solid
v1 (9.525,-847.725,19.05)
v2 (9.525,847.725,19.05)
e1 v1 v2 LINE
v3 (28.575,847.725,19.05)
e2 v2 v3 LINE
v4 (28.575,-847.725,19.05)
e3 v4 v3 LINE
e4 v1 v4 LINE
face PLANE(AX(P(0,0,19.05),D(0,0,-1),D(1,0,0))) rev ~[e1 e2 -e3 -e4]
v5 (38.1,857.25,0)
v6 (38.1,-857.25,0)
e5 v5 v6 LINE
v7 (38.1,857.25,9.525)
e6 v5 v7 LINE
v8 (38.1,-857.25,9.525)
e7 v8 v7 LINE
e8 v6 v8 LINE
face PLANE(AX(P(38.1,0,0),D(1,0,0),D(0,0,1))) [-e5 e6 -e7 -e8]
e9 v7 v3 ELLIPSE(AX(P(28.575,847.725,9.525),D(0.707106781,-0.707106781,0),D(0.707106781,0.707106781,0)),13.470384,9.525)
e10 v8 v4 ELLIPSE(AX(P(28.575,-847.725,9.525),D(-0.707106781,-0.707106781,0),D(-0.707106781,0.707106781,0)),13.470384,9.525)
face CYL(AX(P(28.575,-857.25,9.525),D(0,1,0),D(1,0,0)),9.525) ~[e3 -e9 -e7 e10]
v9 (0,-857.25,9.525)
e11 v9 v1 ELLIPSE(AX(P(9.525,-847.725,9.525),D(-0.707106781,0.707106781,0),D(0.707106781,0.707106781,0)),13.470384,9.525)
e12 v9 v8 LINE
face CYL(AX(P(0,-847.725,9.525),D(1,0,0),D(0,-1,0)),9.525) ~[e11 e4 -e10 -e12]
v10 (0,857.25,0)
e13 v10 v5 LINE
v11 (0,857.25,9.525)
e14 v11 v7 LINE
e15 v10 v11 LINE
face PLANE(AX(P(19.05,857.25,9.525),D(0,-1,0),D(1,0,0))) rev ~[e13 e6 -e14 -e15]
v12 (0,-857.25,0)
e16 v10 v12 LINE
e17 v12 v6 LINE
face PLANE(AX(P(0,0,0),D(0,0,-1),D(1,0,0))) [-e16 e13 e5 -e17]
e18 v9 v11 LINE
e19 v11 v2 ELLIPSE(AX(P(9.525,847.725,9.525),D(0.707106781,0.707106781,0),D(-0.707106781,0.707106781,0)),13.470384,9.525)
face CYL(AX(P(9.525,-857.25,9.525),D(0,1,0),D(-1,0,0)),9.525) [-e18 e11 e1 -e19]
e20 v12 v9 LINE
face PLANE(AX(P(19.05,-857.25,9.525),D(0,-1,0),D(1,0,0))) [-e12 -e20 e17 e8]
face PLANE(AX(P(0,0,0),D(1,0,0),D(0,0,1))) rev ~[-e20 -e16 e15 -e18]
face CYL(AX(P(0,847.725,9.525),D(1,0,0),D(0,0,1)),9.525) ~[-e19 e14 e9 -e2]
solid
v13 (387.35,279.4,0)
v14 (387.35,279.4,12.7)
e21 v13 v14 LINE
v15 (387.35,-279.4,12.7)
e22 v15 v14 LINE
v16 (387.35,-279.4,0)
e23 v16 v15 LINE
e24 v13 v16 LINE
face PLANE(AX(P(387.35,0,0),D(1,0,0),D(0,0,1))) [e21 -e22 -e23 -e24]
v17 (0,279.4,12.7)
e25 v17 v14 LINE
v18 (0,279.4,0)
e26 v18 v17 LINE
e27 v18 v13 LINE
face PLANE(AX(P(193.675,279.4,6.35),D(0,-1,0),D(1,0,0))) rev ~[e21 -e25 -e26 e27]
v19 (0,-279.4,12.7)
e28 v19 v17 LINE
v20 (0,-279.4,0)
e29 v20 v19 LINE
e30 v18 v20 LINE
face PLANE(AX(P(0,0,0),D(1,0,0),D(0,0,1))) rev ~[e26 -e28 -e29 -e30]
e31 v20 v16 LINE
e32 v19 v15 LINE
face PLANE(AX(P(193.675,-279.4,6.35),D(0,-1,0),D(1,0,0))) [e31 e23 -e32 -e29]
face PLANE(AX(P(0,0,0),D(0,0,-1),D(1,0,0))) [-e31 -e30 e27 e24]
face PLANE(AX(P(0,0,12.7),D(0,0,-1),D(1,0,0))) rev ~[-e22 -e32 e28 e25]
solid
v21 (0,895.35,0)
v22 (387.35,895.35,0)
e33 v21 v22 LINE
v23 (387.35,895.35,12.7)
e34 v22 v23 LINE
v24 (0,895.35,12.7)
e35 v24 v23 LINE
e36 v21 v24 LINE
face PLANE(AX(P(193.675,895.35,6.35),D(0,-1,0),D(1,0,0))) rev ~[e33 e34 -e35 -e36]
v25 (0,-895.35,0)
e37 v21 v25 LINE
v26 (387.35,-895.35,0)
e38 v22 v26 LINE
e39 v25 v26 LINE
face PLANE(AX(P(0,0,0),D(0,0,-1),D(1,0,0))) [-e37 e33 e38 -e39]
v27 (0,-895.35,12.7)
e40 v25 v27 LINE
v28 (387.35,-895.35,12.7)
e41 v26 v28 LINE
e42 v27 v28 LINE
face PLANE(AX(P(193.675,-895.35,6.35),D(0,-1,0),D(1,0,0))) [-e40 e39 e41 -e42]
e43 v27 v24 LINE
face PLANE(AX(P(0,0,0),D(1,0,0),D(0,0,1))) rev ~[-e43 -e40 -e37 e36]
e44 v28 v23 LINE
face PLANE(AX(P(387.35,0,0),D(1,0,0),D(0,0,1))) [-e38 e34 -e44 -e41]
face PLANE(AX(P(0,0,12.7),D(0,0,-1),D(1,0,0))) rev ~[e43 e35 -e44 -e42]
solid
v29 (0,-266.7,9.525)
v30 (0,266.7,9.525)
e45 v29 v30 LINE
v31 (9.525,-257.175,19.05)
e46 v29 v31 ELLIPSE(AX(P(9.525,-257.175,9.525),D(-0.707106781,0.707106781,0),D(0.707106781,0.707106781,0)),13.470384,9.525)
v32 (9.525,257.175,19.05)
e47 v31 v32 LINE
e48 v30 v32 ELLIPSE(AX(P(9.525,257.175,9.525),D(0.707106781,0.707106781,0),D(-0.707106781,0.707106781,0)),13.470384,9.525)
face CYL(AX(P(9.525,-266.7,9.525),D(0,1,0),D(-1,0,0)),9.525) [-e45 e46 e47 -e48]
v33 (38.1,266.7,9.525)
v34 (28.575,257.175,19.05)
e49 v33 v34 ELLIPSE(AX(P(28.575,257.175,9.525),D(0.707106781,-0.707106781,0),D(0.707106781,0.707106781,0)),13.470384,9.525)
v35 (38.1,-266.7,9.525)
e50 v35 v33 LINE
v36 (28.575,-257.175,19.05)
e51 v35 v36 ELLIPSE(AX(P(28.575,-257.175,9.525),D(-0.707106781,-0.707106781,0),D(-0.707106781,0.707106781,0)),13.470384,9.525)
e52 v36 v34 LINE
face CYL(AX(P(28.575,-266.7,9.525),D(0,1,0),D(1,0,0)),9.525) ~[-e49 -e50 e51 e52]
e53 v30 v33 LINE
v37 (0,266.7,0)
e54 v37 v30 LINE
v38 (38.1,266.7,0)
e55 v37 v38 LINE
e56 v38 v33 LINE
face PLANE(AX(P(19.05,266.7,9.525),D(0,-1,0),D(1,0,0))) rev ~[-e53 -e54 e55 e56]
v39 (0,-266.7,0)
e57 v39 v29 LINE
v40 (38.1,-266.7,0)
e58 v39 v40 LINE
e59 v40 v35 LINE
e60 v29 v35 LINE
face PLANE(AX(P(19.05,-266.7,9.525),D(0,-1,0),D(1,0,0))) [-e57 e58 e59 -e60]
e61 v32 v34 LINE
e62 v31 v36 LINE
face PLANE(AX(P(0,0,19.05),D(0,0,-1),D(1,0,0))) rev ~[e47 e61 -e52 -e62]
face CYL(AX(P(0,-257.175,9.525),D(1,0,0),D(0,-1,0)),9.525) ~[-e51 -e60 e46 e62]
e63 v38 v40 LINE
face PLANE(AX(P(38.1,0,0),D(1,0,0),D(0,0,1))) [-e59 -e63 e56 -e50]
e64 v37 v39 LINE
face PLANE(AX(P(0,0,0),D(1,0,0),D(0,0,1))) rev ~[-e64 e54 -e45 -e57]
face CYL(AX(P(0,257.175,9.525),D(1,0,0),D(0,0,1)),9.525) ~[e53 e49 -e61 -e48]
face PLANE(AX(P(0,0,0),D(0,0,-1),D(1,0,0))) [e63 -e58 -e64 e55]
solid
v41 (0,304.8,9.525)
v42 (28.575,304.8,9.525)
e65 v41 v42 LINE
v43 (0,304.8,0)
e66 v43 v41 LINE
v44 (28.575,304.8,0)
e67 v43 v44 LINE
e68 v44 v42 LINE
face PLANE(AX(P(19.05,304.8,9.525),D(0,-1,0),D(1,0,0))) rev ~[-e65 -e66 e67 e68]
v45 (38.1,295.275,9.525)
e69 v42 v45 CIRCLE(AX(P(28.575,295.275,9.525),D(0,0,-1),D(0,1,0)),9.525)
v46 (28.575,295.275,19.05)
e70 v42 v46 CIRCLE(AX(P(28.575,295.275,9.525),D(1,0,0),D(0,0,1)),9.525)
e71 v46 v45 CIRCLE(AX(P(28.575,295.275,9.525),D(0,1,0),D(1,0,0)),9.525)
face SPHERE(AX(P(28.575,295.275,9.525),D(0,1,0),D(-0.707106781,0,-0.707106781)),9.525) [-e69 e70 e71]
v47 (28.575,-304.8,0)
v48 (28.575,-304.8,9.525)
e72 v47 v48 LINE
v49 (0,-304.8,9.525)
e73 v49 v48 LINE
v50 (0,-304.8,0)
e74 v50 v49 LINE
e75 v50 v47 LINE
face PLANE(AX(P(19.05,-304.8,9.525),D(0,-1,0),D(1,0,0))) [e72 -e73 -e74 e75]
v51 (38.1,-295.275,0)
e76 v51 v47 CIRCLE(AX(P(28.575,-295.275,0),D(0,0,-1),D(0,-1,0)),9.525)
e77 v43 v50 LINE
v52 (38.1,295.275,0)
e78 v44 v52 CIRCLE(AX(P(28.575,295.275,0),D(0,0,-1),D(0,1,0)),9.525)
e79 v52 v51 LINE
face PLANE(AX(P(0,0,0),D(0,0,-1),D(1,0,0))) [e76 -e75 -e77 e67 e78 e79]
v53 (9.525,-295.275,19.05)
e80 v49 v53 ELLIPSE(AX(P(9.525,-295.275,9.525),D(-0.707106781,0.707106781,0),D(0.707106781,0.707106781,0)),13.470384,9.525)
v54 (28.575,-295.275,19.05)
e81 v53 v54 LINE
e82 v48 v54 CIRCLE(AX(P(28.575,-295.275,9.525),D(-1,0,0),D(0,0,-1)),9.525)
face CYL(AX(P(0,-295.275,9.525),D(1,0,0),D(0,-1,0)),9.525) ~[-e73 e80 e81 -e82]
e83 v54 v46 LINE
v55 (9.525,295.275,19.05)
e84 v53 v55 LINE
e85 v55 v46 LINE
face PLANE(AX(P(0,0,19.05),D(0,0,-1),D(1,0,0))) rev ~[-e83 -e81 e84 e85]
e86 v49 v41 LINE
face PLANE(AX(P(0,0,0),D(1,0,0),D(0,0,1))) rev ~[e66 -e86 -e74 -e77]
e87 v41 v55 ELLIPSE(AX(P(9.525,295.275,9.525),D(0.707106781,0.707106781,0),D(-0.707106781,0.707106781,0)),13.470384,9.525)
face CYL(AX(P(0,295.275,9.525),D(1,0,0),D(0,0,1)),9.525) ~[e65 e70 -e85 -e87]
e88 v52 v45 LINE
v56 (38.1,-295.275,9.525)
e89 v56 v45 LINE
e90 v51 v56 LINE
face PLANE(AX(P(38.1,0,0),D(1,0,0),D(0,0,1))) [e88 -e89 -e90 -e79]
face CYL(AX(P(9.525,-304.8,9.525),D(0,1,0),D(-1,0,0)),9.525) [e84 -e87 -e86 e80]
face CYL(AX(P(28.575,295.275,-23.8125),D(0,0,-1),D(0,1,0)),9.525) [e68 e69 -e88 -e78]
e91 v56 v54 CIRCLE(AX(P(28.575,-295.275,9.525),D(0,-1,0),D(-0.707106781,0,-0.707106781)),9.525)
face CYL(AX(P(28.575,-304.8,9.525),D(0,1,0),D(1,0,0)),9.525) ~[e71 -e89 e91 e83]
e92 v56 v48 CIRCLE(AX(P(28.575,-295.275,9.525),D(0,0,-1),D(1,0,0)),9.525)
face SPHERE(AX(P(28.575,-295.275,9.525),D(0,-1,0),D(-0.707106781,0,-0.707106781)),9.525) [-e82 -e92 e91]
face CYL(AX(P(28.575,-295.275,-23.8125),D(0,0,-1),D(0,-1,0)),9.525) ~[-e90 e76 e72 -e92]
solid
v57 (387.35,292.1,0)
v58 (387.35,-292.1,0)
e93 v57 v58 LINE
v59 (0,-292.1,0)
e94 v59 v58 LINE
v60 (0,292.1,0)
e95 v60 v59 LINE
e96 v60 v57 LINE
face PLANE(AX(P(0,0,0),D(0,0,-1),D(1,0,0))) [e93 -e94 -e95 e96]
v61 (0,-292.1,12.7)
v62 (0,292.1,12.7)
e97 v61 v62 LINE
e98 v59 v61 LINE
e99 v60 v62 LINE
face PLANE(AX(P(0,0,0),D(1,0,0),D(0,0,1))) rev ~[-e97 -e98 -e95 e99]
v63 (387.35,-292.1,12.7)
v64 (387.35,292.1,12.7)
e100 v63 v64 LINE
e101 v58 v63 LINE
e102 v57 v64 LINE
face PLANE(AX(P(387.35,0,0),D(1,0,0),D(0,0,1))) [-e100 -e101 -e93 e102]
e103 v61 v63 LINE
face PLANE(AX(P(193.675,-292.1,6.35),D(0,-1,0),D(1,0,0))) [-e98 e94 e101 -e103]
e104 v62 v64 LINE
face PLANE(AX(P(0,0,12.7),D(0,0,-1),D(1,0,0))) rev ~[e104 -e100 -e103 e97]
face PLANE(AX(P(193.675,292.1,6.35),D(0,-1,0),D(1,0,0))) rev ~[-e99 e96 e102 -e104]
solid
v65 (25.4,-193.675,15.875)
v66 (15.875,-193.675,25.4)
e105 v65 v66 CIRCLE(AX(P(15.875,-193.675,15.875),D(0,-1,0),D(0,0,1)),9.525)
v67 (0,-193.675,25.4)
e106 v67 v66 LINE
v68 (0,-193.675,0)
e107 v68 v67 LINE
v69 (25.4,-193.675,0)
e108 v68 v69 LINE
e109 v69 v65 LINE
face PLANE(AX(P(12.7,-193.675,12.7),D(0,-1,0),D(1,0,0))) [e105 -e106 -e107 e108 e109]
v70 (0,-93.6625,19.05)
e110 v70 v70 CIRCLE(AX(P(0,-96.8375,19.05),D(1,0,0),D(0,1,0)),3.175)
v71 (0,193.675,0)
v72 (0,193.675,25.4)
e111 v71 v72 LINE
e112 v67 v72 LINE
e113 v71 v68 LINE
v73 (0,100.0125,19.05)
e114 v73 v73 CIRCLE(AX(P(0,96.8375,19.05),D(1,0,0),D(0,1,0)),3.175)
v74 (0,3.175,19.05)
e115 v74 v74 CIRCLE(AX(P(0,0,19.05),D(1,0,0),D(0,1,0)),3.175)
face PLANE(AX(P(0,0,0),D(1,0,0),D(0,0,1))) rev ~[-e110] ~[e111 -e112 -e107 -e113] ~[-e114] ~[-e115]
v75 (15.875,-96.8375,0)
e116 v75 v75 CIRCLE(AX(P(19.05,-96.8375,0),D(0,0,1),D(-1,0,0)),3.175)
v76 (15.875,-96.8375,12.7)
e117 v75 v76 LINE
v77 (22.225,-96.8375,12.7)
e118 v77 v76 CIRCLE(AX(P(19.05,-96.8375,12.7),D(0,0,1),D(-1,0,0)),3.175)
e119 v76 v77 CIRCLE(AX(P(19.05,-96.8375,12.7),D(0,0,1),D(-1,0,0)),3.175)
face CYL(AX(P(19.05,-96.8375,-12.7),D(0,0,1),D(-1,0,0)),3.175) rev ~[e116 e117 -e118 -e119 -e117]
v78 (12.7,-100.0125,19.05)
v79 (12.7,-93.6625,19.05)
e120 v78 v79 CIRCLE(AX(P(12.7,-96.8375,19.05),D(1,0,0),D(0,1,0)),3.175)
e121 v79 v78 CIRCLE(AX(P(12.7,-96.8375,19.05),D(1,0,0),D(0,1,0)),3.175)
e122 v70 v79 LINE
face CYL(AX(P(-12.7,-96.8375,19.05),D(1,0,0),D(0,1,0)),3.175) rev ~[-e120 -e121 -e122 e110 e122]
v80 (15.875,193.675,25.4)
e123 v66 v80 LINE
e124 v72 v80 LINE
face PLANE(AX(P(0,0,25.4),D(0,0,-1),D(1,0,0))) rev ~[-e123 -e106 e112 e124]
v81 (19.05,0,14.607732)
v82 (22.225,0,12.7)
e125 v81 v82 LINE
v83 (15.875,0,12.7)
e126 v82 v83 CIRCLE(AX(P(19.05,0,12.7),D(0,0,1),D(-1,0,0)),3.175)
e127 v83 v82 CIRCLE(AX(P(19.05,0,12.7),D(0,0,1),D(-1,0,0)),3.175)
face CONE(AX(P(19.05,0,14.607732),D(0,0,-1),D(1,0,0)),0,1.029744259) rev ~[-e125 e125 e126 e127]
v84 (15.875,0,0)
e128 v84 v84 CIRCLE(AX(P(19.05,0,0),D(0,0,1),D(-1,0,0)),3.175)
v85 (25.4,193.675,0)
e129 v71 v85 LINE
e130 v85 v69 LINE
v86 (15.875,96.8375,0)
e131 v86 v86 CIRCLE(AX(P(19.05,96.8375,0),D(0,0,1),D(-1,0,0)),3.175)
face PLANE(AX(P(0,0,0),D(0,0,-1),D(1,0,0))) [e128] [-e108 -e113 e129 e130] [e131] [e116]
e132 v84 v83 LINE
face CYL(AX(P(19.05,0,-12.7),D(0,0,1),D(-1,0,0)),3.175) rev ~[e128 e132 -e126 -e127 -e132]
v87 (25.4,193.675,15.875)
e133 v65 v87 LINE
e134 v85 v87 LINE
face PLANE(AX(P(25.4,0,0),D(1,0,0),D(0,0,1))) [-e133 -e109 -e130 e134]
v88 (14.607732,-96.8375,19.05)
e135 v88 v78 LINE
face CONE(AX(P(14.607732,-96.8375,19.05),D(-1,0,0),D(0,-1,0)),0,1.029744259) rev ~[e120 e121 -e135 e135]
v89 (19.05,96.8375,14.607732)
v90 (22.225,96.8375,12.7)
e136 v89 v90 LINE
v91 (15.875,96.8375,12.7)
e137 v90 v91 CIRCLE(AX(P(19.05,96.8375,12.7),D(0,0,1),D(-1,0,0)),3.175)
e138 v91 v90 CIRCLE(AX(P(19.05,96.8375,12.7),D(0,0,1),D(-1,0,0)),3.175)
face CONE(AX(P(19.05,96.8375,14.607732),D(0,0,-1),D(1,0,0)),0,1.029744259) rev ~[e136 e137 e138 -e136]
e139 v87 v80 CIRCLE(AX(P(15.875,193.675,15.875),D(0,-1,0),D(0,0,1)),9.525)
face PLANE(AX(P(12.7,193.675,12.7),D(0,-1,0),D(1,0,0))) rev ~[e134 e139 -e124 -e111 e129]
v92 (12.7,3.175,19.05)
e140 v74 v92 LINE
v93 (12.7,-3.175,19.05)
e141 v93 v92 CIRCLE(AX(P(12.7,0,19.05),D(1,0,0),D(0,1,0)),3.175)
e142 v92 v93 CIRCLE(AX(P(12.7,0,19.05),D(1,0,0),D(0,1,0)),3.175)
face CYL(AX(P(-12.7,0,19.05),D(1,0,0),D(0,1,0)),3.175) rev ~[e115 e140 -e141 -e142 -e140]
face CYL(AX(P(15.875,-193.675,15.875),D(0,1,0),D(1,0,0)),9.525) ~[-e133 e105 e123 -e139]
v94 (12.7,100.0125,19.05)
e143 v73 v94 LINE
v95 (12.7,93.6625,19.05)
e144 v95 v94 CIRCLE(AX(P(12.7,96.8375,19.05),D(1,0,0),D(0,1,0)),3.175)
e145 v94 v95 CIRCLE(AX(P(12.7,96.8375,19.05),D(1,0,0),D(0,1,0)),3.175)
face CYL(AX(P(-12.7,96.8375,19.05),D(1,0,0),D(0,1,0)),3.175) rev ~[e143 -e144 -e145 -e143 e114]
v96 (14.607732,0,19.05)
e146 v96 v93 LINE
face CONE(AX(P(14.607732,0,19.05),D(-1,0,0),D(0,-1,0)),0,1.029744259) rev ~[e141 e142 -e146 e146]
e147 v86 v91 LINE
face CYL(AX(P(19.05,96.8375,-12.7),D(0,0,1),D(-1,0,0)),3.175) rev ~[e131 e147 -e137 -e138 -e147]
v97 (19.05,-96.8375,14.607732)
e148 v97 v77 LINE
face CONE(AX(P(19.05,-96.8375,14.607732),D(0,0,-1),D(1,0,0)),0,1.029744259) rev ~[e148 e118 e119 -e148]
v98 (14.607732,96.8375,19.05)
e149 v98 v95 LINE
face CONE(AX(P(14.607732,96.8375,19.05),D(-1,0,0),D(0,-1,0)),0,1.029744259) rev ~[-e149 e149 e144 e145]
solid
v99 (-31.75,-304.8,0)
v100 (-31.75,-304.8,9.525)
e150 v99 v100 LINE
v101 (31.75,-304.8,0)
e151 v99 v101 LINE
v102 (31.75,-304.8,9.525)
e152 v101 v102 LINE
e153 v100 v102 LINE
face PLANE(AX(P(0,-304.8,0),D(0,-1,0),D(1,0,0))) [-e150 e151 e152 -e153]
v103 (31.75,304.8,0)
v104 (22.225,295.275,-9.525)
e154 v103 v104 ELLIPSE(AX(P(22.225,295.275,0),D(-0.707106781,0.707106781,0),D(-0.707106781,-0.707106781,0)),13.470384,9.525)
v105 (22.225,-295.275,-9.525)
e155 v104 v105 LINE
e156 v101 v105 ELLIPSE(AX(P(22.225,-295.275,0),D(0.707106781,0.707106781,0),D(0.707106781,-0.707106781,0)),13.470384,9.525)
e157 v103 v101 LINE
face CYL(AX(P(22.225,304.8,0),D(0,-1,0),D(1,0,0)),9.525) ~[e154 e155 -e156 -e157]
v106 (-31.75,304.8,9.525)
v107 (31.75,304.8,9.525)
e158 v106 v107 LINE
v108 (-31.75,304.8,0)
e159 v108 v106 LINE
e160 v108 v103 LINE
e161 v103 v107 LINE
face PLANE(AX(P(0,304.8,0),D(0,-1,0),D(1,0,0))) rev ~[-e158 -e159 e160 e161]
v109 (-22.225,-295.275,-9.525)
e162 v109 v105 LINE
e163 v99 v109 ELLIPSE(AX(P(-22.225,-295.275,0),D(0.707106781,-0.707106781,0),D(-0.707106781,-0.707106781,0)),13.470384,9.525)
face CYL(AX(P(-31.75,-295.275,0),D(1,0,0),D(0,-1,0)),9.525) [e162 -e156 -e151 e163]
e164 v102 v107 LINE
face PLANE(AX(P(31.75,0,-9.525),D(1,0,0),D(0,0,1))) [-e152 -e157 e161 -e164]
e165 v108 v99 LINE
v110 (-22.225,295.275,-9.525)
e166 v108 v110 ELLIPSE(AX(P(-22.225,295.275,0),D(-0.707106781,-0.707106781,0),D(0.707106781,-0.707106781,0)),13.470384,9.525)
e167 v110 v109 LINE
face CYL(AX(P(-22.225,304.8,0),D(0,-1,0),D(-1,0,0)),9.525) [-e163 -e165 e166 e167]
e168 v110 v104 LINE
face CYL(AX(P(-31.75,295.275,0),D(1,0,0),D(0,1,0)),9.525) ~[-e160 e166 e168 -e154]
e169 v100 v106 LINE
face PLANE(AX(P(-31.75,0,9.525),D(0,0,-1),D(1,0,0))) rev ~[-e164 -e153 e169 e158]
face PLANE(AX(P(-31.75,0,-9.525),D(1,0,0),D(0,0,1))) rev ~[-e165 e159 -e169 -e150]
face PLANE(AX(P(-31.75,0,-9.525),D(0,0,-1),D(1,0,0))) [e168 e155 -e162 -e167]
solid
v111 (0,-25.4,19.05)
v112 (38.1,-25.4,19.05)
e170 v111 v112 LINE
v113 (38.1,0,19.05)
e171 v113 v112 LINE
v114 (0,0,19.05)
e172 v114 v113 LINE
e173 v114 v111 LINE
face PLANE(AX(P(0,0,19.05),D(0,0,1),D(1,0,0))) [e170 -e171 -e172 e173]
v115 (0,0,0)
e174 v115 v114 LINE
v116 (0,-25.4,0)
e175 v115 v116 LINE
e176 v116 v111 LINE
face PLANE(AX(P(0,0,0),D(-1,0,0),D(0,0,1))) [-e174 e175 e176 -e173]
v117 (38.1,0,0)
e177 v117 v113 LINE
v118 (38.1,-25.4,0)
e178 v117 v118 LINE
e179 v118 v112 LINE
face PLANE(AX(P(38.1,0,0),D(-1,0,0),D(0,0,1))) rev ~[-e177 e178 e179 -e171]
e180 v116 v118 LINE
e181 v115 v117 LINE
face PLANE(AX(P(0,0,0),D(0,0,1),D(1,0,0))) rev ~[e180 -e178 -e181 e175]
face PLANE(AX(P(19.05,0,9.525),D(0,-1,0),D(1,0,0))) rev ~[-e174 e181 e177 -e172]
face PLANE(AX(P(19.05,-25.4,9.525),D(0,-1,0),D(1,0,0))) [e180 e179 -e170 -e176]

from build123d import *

# Parameters (mm, degrees)
F0_W          = 63.5
F0_H          = 19.05
F1_DEPTH      = 304.8
F2_R          = 9.525
F3_W          = 38.1
F3_H          = 19.05
F4_DEPTH      = 304.8
F5_R          = 9.525
F6_W          = 38.1
F6_H          = 19.05
F7_DEPTH      = 857.25
F8_R          = 9.525
F9_W          = 38.1
F9_H          = 19.05
F10_DEPTH     = 266.7
F11_R         = 9.525
F12_DEPTH     = 25.4
F13_W         = 25.4
F13_H         = 25.4
F14_DEPTH     = 193.675
F15_R         = 9.525
F17_D         = 6.35
F17_DEPTH     = 12.7
F17_TIP       = 1.9077324654
F19_D         = 6.35
F19_DEPTH     = 12.7
F19_TIP       = 1.9077324654
F20_T1_DEPTH  = 33.3375
F20_S5_W      = 9.525
F20_S5_H      = 9.525
F20_T6_DEPTH  = 9.525
F20_S11_W     = 9.525
F20_S11_H     = 9.525
F20_T12_DEPTH = 9.525
F21_W         = 387.35
F21_H         = 12.7
F22_DEPTH     = 279.4
F23_W         = 387.35
F23_H         = 12.7
F24_DEPTH     = 895.35
F25_W         = 387.35
F25_H         = 12.7
F26_DEPTH     = 292.1


# Not quite as in the source:
# - a fillet or chamfer that OpenCascade refuses, or shapes differently, is made with other operations: its cross-section is extruded or revolved along the edge and cut away or added


with BuildPart() as f1:
    # F0 (on Front) → F1 (new body, symmetric)
    with BuildSketch(Plane.XZ):
        Rectangle(F0_W, F0_H)
    extrude(amount=F1_DEPTH, both=True)

    # F2
    f2_edges = [f1.edges().sort_by_distance(p)[0] for p in [
        (31.75, 0, -9.525),
        (-31.75, 0, -9.525),
        (0, -304.8, -9.525),
        (0, 304.8, -9.525),
    ]]
    fillet(f2_edges, radius=F2_R)


with BuildPart() as f4:
    # F3 (on Front) → F4 (new body, symmetric)
    with BuildSketch(Plane.XZ):
        with Locations((19.05, 9.525)):
            Rectangle(F3_W, F3_H)
    extrude(amount=F4_DEPTH, both=True)

    # F5
    f5_edges = [f4.edges().sort_by_distance(p)[0] for p in [
        (38.1, 0, 19.05),
        (0, 0, 19.05),
        (19.05, -304.8, 19.05),
        (19.05, 304.8, 19.05),
    ]]
    fillet(f5_edges, radius=F5_R)

    # F20: fillet of radius 9.525 on 2 edges, made by hand

    # F20_s2 → F20_t1 (cut)
    with BuildSketch(Plane.XY.offset(-23.8125)):
        with BuildLine():
            ThreePointArc((28.575, -304.8), (35.3101920908, -302.0101920908), (38.1, -295.275))
            Line((38.1, -295.275), (38.1, -304.8))
            Line((38.1, -304.8), (28.575, -304.8))
        make_face()
        with BuildLine():
            ThreePointArc((28.575, 304.8), (35.3101920908, 302.0101920908), (38.1, 295.275))
            Line((38.1, 295.275), (38.1, 304.8))
            Line((38.1, 304.8), (28.575, 304.8))
        make_face()
    extrude(amount=F20_T1_DEPTH, mode=Mode.SUBTRACT)


with BuildPart() as f7:
    # F6 (on Front) → F7 (new body, symmetric)
    with BuildSketch(Plane.XZ):
        with Locations((19.05, 9.525)):
            Rectangle(F6_W, F6_H)
    extrude(amount=F7_DEPTH, both=True)

    # F8
    f8_edges = [f7.edges().sort_by_distance(p)[0] for p in [
        (38.1, 0, 19.05),
        (0, 0, 19.05),
        (19.05, -857.25, 19.05),
        (19.05, 857.25, 19.05),
    ]]
    fillet(f8_edges, radius=F8_R)


with BuildPart() as f10:
    # F9 (on Front) → F10 (new body, symmetric)
    with BuildSketch(Plane.XZ):
        with Locations((19.05, 9.525)):
            Rectangle(F9_W, F9_H)
    extrude(amount=F10_DEPTH, both=True)

    # F11
    f11_edges = [f10.edges().sort_by_distance(p)[0] for p in [
        (38.1, 0, 19.05),
        (0, 0, 19.05),
        (19.05, -266.7, 19.05),
        (19.05, 266.7, 19.05),
    ]]
    fillet(f11_edges, radius=F11_R)


with BuildPart() as f12:
    # F9 (on Front) → F12 (new body)
    with BuildSketch(Plane.XZ):
        with Locations((19.05, 9.525)):
            Rectangle(F9_W, F9_H)
    extrude(amount=F12_DEPTH)


with BuildPart() as f14:
    # F13 (on Front) → F14 (new body, symmetric)
    with BuildSketch(Plane.XZ):
        with Locations((12.7, 12.7)):
            Rectangle(F13_W, F13_H)
    extrude(amount=F14_DEPTH, both=True)

    # F15
    f15_edges = [f14.edges().sort_by_distance(p)[0] for p in [
        (25.4, 0, 25.4),
    ]]
    fillet(f15_edges, radius=F15_R)

    # F17
    with Locations(Plane(origin=(0, 0, 0), x_dir=(0, -1, 0), z_dir=(-1, 0, 0))):
        with Locations((-96.8375, 19.05), (0, 19.05), (96.8375, 19.05)):
            Hole(F17_D / 2, depth=F17_DEPTH)
            with Locations((0, 0, -(F17_DEPTH + F17_TIP / 2))):  # 118° drill point
                Cone(0, F17_D / 2, F17_TIP, mode=Mode.SUBTRACT)

    # F19
    with Locations(Plane(origin=(0, 0, 0), x_dir=(1, 0, 0), z_dir=(0, 0, -1))):
        with Locations((19.05, 96.8375), (19.05, 0), (19.05, -96.8375)):
            Hole(F19_D / 2, depth=F19_DEPTH)
            with Locations((0, 0, -(F19_DEPTH + F19_TIP / 2))):  # 118° drill point
                Cone(0, F19_D / 2, F19_TIP, mode=Mode.SUBTRACT)


with BuildPart() as f20_tool4:
    # F20_s5 → F20_t6 (new body)
    with BuildSketch(Plane.XZ.offset(-295.275)):
        with Locations((33.3375, 14.2875)):
            Rectangle(F20_S5_W, F20_S5_H)
    extrude(amount=-F20_T6_DEPTH)

    # F20_s7 → F20_t8 (revolve, cut)
    with BuildSketch(Plane(origin=(28.575, 295.275, 9.525), x_dir=(-0.7071067812, 0, -0.7071067812), z_dir=(0.7071067812, 0, -0.7071067812))):
        with BuildLine():
            ThreePointArc((0, -9.525), (9.525, 0), (0, 9.525))
            Line((0, 9.525), (0, -9.525))
        make_face()
    revolve(axis=Axis((28.575, 295.275, 9.525), (0, 1, 0)), mode=Mode.SUBTRACT)


with BuildPart() as f4_1:
    add(f4.part)

    # F20_t3: cut F20_tool4
    add(f20_tool4.part, mode=Mode.SUBTRACT)


with BuildPart() as f20_tool10:
    # F20_s11 → F20_t12 (new body)
    with BuildSketch(Plane.XZ.offset(295.275)):
        with Locations((33.3375, 14.2875)):
            Rectangle(F20_S11_W, F20_S11_H)
    extrude(amount=F20_T12_DEPTH)

    # F20_s13 → F20_t14 (revolve, cut)
    with BuildSketch(Plane(origin=(28.575, -295.275, 9.525), x_dir=(-0.7071067812, 0, -0.7071067812), z_dir=(-0.7071067812, 0, 0.7071067812))):
        with BuildLine():
            ThreePointArc((0, -9.525), (9.525, 0), (0, 9.525))
            Line((0, 9.525), (0, -9.525))
        make_face()
    revolve(axis=Axis((28.575, -295.275, 9.525), (0, -1, 0)), mode=Mode.SUBTRACT)


with BuildPart() as f4_2:
    add(f4_1.part)

    # F20_t9: cut F20_tool10
    add(f20_tool10.part, mode=Mode.SUBTRACT)


with BuildPart() as f22:
    # F21 (on Front) → F22 (new body, symmetric)
    with BuildSketch(Plane.XZ):
        with Locations((193.675, 6.35)):
            Rectangle(F21_W, F21_H)
    extrude(amount=F22_DEPTH, both=True)


with BuildPart() as f24:
    # F23 (on Front) → F24 (new body, symmetric)
    with BuildSketch(Plane.XZ):
        with Locations((193.675, 6.35)):
            Rectangle(F23_W, F23_H)
    extrude(amount=F24_DEPTH, both=True)


with BuildPart() as f26:
    # F25 (on Front) → F26 (new body, symmetric)
    with BuildSketch(Plane.XZ):
        with Locations((193.675, 6.35)):
            Rectangle(F25_W, F25_H)
    extrude(amount=F26_DEPTH, both=True)


solid = Compound([f1.part, f7.part, f10.part, f12.part, f14.part, f4_2.part, f22.part, f24.part, f26.part])
